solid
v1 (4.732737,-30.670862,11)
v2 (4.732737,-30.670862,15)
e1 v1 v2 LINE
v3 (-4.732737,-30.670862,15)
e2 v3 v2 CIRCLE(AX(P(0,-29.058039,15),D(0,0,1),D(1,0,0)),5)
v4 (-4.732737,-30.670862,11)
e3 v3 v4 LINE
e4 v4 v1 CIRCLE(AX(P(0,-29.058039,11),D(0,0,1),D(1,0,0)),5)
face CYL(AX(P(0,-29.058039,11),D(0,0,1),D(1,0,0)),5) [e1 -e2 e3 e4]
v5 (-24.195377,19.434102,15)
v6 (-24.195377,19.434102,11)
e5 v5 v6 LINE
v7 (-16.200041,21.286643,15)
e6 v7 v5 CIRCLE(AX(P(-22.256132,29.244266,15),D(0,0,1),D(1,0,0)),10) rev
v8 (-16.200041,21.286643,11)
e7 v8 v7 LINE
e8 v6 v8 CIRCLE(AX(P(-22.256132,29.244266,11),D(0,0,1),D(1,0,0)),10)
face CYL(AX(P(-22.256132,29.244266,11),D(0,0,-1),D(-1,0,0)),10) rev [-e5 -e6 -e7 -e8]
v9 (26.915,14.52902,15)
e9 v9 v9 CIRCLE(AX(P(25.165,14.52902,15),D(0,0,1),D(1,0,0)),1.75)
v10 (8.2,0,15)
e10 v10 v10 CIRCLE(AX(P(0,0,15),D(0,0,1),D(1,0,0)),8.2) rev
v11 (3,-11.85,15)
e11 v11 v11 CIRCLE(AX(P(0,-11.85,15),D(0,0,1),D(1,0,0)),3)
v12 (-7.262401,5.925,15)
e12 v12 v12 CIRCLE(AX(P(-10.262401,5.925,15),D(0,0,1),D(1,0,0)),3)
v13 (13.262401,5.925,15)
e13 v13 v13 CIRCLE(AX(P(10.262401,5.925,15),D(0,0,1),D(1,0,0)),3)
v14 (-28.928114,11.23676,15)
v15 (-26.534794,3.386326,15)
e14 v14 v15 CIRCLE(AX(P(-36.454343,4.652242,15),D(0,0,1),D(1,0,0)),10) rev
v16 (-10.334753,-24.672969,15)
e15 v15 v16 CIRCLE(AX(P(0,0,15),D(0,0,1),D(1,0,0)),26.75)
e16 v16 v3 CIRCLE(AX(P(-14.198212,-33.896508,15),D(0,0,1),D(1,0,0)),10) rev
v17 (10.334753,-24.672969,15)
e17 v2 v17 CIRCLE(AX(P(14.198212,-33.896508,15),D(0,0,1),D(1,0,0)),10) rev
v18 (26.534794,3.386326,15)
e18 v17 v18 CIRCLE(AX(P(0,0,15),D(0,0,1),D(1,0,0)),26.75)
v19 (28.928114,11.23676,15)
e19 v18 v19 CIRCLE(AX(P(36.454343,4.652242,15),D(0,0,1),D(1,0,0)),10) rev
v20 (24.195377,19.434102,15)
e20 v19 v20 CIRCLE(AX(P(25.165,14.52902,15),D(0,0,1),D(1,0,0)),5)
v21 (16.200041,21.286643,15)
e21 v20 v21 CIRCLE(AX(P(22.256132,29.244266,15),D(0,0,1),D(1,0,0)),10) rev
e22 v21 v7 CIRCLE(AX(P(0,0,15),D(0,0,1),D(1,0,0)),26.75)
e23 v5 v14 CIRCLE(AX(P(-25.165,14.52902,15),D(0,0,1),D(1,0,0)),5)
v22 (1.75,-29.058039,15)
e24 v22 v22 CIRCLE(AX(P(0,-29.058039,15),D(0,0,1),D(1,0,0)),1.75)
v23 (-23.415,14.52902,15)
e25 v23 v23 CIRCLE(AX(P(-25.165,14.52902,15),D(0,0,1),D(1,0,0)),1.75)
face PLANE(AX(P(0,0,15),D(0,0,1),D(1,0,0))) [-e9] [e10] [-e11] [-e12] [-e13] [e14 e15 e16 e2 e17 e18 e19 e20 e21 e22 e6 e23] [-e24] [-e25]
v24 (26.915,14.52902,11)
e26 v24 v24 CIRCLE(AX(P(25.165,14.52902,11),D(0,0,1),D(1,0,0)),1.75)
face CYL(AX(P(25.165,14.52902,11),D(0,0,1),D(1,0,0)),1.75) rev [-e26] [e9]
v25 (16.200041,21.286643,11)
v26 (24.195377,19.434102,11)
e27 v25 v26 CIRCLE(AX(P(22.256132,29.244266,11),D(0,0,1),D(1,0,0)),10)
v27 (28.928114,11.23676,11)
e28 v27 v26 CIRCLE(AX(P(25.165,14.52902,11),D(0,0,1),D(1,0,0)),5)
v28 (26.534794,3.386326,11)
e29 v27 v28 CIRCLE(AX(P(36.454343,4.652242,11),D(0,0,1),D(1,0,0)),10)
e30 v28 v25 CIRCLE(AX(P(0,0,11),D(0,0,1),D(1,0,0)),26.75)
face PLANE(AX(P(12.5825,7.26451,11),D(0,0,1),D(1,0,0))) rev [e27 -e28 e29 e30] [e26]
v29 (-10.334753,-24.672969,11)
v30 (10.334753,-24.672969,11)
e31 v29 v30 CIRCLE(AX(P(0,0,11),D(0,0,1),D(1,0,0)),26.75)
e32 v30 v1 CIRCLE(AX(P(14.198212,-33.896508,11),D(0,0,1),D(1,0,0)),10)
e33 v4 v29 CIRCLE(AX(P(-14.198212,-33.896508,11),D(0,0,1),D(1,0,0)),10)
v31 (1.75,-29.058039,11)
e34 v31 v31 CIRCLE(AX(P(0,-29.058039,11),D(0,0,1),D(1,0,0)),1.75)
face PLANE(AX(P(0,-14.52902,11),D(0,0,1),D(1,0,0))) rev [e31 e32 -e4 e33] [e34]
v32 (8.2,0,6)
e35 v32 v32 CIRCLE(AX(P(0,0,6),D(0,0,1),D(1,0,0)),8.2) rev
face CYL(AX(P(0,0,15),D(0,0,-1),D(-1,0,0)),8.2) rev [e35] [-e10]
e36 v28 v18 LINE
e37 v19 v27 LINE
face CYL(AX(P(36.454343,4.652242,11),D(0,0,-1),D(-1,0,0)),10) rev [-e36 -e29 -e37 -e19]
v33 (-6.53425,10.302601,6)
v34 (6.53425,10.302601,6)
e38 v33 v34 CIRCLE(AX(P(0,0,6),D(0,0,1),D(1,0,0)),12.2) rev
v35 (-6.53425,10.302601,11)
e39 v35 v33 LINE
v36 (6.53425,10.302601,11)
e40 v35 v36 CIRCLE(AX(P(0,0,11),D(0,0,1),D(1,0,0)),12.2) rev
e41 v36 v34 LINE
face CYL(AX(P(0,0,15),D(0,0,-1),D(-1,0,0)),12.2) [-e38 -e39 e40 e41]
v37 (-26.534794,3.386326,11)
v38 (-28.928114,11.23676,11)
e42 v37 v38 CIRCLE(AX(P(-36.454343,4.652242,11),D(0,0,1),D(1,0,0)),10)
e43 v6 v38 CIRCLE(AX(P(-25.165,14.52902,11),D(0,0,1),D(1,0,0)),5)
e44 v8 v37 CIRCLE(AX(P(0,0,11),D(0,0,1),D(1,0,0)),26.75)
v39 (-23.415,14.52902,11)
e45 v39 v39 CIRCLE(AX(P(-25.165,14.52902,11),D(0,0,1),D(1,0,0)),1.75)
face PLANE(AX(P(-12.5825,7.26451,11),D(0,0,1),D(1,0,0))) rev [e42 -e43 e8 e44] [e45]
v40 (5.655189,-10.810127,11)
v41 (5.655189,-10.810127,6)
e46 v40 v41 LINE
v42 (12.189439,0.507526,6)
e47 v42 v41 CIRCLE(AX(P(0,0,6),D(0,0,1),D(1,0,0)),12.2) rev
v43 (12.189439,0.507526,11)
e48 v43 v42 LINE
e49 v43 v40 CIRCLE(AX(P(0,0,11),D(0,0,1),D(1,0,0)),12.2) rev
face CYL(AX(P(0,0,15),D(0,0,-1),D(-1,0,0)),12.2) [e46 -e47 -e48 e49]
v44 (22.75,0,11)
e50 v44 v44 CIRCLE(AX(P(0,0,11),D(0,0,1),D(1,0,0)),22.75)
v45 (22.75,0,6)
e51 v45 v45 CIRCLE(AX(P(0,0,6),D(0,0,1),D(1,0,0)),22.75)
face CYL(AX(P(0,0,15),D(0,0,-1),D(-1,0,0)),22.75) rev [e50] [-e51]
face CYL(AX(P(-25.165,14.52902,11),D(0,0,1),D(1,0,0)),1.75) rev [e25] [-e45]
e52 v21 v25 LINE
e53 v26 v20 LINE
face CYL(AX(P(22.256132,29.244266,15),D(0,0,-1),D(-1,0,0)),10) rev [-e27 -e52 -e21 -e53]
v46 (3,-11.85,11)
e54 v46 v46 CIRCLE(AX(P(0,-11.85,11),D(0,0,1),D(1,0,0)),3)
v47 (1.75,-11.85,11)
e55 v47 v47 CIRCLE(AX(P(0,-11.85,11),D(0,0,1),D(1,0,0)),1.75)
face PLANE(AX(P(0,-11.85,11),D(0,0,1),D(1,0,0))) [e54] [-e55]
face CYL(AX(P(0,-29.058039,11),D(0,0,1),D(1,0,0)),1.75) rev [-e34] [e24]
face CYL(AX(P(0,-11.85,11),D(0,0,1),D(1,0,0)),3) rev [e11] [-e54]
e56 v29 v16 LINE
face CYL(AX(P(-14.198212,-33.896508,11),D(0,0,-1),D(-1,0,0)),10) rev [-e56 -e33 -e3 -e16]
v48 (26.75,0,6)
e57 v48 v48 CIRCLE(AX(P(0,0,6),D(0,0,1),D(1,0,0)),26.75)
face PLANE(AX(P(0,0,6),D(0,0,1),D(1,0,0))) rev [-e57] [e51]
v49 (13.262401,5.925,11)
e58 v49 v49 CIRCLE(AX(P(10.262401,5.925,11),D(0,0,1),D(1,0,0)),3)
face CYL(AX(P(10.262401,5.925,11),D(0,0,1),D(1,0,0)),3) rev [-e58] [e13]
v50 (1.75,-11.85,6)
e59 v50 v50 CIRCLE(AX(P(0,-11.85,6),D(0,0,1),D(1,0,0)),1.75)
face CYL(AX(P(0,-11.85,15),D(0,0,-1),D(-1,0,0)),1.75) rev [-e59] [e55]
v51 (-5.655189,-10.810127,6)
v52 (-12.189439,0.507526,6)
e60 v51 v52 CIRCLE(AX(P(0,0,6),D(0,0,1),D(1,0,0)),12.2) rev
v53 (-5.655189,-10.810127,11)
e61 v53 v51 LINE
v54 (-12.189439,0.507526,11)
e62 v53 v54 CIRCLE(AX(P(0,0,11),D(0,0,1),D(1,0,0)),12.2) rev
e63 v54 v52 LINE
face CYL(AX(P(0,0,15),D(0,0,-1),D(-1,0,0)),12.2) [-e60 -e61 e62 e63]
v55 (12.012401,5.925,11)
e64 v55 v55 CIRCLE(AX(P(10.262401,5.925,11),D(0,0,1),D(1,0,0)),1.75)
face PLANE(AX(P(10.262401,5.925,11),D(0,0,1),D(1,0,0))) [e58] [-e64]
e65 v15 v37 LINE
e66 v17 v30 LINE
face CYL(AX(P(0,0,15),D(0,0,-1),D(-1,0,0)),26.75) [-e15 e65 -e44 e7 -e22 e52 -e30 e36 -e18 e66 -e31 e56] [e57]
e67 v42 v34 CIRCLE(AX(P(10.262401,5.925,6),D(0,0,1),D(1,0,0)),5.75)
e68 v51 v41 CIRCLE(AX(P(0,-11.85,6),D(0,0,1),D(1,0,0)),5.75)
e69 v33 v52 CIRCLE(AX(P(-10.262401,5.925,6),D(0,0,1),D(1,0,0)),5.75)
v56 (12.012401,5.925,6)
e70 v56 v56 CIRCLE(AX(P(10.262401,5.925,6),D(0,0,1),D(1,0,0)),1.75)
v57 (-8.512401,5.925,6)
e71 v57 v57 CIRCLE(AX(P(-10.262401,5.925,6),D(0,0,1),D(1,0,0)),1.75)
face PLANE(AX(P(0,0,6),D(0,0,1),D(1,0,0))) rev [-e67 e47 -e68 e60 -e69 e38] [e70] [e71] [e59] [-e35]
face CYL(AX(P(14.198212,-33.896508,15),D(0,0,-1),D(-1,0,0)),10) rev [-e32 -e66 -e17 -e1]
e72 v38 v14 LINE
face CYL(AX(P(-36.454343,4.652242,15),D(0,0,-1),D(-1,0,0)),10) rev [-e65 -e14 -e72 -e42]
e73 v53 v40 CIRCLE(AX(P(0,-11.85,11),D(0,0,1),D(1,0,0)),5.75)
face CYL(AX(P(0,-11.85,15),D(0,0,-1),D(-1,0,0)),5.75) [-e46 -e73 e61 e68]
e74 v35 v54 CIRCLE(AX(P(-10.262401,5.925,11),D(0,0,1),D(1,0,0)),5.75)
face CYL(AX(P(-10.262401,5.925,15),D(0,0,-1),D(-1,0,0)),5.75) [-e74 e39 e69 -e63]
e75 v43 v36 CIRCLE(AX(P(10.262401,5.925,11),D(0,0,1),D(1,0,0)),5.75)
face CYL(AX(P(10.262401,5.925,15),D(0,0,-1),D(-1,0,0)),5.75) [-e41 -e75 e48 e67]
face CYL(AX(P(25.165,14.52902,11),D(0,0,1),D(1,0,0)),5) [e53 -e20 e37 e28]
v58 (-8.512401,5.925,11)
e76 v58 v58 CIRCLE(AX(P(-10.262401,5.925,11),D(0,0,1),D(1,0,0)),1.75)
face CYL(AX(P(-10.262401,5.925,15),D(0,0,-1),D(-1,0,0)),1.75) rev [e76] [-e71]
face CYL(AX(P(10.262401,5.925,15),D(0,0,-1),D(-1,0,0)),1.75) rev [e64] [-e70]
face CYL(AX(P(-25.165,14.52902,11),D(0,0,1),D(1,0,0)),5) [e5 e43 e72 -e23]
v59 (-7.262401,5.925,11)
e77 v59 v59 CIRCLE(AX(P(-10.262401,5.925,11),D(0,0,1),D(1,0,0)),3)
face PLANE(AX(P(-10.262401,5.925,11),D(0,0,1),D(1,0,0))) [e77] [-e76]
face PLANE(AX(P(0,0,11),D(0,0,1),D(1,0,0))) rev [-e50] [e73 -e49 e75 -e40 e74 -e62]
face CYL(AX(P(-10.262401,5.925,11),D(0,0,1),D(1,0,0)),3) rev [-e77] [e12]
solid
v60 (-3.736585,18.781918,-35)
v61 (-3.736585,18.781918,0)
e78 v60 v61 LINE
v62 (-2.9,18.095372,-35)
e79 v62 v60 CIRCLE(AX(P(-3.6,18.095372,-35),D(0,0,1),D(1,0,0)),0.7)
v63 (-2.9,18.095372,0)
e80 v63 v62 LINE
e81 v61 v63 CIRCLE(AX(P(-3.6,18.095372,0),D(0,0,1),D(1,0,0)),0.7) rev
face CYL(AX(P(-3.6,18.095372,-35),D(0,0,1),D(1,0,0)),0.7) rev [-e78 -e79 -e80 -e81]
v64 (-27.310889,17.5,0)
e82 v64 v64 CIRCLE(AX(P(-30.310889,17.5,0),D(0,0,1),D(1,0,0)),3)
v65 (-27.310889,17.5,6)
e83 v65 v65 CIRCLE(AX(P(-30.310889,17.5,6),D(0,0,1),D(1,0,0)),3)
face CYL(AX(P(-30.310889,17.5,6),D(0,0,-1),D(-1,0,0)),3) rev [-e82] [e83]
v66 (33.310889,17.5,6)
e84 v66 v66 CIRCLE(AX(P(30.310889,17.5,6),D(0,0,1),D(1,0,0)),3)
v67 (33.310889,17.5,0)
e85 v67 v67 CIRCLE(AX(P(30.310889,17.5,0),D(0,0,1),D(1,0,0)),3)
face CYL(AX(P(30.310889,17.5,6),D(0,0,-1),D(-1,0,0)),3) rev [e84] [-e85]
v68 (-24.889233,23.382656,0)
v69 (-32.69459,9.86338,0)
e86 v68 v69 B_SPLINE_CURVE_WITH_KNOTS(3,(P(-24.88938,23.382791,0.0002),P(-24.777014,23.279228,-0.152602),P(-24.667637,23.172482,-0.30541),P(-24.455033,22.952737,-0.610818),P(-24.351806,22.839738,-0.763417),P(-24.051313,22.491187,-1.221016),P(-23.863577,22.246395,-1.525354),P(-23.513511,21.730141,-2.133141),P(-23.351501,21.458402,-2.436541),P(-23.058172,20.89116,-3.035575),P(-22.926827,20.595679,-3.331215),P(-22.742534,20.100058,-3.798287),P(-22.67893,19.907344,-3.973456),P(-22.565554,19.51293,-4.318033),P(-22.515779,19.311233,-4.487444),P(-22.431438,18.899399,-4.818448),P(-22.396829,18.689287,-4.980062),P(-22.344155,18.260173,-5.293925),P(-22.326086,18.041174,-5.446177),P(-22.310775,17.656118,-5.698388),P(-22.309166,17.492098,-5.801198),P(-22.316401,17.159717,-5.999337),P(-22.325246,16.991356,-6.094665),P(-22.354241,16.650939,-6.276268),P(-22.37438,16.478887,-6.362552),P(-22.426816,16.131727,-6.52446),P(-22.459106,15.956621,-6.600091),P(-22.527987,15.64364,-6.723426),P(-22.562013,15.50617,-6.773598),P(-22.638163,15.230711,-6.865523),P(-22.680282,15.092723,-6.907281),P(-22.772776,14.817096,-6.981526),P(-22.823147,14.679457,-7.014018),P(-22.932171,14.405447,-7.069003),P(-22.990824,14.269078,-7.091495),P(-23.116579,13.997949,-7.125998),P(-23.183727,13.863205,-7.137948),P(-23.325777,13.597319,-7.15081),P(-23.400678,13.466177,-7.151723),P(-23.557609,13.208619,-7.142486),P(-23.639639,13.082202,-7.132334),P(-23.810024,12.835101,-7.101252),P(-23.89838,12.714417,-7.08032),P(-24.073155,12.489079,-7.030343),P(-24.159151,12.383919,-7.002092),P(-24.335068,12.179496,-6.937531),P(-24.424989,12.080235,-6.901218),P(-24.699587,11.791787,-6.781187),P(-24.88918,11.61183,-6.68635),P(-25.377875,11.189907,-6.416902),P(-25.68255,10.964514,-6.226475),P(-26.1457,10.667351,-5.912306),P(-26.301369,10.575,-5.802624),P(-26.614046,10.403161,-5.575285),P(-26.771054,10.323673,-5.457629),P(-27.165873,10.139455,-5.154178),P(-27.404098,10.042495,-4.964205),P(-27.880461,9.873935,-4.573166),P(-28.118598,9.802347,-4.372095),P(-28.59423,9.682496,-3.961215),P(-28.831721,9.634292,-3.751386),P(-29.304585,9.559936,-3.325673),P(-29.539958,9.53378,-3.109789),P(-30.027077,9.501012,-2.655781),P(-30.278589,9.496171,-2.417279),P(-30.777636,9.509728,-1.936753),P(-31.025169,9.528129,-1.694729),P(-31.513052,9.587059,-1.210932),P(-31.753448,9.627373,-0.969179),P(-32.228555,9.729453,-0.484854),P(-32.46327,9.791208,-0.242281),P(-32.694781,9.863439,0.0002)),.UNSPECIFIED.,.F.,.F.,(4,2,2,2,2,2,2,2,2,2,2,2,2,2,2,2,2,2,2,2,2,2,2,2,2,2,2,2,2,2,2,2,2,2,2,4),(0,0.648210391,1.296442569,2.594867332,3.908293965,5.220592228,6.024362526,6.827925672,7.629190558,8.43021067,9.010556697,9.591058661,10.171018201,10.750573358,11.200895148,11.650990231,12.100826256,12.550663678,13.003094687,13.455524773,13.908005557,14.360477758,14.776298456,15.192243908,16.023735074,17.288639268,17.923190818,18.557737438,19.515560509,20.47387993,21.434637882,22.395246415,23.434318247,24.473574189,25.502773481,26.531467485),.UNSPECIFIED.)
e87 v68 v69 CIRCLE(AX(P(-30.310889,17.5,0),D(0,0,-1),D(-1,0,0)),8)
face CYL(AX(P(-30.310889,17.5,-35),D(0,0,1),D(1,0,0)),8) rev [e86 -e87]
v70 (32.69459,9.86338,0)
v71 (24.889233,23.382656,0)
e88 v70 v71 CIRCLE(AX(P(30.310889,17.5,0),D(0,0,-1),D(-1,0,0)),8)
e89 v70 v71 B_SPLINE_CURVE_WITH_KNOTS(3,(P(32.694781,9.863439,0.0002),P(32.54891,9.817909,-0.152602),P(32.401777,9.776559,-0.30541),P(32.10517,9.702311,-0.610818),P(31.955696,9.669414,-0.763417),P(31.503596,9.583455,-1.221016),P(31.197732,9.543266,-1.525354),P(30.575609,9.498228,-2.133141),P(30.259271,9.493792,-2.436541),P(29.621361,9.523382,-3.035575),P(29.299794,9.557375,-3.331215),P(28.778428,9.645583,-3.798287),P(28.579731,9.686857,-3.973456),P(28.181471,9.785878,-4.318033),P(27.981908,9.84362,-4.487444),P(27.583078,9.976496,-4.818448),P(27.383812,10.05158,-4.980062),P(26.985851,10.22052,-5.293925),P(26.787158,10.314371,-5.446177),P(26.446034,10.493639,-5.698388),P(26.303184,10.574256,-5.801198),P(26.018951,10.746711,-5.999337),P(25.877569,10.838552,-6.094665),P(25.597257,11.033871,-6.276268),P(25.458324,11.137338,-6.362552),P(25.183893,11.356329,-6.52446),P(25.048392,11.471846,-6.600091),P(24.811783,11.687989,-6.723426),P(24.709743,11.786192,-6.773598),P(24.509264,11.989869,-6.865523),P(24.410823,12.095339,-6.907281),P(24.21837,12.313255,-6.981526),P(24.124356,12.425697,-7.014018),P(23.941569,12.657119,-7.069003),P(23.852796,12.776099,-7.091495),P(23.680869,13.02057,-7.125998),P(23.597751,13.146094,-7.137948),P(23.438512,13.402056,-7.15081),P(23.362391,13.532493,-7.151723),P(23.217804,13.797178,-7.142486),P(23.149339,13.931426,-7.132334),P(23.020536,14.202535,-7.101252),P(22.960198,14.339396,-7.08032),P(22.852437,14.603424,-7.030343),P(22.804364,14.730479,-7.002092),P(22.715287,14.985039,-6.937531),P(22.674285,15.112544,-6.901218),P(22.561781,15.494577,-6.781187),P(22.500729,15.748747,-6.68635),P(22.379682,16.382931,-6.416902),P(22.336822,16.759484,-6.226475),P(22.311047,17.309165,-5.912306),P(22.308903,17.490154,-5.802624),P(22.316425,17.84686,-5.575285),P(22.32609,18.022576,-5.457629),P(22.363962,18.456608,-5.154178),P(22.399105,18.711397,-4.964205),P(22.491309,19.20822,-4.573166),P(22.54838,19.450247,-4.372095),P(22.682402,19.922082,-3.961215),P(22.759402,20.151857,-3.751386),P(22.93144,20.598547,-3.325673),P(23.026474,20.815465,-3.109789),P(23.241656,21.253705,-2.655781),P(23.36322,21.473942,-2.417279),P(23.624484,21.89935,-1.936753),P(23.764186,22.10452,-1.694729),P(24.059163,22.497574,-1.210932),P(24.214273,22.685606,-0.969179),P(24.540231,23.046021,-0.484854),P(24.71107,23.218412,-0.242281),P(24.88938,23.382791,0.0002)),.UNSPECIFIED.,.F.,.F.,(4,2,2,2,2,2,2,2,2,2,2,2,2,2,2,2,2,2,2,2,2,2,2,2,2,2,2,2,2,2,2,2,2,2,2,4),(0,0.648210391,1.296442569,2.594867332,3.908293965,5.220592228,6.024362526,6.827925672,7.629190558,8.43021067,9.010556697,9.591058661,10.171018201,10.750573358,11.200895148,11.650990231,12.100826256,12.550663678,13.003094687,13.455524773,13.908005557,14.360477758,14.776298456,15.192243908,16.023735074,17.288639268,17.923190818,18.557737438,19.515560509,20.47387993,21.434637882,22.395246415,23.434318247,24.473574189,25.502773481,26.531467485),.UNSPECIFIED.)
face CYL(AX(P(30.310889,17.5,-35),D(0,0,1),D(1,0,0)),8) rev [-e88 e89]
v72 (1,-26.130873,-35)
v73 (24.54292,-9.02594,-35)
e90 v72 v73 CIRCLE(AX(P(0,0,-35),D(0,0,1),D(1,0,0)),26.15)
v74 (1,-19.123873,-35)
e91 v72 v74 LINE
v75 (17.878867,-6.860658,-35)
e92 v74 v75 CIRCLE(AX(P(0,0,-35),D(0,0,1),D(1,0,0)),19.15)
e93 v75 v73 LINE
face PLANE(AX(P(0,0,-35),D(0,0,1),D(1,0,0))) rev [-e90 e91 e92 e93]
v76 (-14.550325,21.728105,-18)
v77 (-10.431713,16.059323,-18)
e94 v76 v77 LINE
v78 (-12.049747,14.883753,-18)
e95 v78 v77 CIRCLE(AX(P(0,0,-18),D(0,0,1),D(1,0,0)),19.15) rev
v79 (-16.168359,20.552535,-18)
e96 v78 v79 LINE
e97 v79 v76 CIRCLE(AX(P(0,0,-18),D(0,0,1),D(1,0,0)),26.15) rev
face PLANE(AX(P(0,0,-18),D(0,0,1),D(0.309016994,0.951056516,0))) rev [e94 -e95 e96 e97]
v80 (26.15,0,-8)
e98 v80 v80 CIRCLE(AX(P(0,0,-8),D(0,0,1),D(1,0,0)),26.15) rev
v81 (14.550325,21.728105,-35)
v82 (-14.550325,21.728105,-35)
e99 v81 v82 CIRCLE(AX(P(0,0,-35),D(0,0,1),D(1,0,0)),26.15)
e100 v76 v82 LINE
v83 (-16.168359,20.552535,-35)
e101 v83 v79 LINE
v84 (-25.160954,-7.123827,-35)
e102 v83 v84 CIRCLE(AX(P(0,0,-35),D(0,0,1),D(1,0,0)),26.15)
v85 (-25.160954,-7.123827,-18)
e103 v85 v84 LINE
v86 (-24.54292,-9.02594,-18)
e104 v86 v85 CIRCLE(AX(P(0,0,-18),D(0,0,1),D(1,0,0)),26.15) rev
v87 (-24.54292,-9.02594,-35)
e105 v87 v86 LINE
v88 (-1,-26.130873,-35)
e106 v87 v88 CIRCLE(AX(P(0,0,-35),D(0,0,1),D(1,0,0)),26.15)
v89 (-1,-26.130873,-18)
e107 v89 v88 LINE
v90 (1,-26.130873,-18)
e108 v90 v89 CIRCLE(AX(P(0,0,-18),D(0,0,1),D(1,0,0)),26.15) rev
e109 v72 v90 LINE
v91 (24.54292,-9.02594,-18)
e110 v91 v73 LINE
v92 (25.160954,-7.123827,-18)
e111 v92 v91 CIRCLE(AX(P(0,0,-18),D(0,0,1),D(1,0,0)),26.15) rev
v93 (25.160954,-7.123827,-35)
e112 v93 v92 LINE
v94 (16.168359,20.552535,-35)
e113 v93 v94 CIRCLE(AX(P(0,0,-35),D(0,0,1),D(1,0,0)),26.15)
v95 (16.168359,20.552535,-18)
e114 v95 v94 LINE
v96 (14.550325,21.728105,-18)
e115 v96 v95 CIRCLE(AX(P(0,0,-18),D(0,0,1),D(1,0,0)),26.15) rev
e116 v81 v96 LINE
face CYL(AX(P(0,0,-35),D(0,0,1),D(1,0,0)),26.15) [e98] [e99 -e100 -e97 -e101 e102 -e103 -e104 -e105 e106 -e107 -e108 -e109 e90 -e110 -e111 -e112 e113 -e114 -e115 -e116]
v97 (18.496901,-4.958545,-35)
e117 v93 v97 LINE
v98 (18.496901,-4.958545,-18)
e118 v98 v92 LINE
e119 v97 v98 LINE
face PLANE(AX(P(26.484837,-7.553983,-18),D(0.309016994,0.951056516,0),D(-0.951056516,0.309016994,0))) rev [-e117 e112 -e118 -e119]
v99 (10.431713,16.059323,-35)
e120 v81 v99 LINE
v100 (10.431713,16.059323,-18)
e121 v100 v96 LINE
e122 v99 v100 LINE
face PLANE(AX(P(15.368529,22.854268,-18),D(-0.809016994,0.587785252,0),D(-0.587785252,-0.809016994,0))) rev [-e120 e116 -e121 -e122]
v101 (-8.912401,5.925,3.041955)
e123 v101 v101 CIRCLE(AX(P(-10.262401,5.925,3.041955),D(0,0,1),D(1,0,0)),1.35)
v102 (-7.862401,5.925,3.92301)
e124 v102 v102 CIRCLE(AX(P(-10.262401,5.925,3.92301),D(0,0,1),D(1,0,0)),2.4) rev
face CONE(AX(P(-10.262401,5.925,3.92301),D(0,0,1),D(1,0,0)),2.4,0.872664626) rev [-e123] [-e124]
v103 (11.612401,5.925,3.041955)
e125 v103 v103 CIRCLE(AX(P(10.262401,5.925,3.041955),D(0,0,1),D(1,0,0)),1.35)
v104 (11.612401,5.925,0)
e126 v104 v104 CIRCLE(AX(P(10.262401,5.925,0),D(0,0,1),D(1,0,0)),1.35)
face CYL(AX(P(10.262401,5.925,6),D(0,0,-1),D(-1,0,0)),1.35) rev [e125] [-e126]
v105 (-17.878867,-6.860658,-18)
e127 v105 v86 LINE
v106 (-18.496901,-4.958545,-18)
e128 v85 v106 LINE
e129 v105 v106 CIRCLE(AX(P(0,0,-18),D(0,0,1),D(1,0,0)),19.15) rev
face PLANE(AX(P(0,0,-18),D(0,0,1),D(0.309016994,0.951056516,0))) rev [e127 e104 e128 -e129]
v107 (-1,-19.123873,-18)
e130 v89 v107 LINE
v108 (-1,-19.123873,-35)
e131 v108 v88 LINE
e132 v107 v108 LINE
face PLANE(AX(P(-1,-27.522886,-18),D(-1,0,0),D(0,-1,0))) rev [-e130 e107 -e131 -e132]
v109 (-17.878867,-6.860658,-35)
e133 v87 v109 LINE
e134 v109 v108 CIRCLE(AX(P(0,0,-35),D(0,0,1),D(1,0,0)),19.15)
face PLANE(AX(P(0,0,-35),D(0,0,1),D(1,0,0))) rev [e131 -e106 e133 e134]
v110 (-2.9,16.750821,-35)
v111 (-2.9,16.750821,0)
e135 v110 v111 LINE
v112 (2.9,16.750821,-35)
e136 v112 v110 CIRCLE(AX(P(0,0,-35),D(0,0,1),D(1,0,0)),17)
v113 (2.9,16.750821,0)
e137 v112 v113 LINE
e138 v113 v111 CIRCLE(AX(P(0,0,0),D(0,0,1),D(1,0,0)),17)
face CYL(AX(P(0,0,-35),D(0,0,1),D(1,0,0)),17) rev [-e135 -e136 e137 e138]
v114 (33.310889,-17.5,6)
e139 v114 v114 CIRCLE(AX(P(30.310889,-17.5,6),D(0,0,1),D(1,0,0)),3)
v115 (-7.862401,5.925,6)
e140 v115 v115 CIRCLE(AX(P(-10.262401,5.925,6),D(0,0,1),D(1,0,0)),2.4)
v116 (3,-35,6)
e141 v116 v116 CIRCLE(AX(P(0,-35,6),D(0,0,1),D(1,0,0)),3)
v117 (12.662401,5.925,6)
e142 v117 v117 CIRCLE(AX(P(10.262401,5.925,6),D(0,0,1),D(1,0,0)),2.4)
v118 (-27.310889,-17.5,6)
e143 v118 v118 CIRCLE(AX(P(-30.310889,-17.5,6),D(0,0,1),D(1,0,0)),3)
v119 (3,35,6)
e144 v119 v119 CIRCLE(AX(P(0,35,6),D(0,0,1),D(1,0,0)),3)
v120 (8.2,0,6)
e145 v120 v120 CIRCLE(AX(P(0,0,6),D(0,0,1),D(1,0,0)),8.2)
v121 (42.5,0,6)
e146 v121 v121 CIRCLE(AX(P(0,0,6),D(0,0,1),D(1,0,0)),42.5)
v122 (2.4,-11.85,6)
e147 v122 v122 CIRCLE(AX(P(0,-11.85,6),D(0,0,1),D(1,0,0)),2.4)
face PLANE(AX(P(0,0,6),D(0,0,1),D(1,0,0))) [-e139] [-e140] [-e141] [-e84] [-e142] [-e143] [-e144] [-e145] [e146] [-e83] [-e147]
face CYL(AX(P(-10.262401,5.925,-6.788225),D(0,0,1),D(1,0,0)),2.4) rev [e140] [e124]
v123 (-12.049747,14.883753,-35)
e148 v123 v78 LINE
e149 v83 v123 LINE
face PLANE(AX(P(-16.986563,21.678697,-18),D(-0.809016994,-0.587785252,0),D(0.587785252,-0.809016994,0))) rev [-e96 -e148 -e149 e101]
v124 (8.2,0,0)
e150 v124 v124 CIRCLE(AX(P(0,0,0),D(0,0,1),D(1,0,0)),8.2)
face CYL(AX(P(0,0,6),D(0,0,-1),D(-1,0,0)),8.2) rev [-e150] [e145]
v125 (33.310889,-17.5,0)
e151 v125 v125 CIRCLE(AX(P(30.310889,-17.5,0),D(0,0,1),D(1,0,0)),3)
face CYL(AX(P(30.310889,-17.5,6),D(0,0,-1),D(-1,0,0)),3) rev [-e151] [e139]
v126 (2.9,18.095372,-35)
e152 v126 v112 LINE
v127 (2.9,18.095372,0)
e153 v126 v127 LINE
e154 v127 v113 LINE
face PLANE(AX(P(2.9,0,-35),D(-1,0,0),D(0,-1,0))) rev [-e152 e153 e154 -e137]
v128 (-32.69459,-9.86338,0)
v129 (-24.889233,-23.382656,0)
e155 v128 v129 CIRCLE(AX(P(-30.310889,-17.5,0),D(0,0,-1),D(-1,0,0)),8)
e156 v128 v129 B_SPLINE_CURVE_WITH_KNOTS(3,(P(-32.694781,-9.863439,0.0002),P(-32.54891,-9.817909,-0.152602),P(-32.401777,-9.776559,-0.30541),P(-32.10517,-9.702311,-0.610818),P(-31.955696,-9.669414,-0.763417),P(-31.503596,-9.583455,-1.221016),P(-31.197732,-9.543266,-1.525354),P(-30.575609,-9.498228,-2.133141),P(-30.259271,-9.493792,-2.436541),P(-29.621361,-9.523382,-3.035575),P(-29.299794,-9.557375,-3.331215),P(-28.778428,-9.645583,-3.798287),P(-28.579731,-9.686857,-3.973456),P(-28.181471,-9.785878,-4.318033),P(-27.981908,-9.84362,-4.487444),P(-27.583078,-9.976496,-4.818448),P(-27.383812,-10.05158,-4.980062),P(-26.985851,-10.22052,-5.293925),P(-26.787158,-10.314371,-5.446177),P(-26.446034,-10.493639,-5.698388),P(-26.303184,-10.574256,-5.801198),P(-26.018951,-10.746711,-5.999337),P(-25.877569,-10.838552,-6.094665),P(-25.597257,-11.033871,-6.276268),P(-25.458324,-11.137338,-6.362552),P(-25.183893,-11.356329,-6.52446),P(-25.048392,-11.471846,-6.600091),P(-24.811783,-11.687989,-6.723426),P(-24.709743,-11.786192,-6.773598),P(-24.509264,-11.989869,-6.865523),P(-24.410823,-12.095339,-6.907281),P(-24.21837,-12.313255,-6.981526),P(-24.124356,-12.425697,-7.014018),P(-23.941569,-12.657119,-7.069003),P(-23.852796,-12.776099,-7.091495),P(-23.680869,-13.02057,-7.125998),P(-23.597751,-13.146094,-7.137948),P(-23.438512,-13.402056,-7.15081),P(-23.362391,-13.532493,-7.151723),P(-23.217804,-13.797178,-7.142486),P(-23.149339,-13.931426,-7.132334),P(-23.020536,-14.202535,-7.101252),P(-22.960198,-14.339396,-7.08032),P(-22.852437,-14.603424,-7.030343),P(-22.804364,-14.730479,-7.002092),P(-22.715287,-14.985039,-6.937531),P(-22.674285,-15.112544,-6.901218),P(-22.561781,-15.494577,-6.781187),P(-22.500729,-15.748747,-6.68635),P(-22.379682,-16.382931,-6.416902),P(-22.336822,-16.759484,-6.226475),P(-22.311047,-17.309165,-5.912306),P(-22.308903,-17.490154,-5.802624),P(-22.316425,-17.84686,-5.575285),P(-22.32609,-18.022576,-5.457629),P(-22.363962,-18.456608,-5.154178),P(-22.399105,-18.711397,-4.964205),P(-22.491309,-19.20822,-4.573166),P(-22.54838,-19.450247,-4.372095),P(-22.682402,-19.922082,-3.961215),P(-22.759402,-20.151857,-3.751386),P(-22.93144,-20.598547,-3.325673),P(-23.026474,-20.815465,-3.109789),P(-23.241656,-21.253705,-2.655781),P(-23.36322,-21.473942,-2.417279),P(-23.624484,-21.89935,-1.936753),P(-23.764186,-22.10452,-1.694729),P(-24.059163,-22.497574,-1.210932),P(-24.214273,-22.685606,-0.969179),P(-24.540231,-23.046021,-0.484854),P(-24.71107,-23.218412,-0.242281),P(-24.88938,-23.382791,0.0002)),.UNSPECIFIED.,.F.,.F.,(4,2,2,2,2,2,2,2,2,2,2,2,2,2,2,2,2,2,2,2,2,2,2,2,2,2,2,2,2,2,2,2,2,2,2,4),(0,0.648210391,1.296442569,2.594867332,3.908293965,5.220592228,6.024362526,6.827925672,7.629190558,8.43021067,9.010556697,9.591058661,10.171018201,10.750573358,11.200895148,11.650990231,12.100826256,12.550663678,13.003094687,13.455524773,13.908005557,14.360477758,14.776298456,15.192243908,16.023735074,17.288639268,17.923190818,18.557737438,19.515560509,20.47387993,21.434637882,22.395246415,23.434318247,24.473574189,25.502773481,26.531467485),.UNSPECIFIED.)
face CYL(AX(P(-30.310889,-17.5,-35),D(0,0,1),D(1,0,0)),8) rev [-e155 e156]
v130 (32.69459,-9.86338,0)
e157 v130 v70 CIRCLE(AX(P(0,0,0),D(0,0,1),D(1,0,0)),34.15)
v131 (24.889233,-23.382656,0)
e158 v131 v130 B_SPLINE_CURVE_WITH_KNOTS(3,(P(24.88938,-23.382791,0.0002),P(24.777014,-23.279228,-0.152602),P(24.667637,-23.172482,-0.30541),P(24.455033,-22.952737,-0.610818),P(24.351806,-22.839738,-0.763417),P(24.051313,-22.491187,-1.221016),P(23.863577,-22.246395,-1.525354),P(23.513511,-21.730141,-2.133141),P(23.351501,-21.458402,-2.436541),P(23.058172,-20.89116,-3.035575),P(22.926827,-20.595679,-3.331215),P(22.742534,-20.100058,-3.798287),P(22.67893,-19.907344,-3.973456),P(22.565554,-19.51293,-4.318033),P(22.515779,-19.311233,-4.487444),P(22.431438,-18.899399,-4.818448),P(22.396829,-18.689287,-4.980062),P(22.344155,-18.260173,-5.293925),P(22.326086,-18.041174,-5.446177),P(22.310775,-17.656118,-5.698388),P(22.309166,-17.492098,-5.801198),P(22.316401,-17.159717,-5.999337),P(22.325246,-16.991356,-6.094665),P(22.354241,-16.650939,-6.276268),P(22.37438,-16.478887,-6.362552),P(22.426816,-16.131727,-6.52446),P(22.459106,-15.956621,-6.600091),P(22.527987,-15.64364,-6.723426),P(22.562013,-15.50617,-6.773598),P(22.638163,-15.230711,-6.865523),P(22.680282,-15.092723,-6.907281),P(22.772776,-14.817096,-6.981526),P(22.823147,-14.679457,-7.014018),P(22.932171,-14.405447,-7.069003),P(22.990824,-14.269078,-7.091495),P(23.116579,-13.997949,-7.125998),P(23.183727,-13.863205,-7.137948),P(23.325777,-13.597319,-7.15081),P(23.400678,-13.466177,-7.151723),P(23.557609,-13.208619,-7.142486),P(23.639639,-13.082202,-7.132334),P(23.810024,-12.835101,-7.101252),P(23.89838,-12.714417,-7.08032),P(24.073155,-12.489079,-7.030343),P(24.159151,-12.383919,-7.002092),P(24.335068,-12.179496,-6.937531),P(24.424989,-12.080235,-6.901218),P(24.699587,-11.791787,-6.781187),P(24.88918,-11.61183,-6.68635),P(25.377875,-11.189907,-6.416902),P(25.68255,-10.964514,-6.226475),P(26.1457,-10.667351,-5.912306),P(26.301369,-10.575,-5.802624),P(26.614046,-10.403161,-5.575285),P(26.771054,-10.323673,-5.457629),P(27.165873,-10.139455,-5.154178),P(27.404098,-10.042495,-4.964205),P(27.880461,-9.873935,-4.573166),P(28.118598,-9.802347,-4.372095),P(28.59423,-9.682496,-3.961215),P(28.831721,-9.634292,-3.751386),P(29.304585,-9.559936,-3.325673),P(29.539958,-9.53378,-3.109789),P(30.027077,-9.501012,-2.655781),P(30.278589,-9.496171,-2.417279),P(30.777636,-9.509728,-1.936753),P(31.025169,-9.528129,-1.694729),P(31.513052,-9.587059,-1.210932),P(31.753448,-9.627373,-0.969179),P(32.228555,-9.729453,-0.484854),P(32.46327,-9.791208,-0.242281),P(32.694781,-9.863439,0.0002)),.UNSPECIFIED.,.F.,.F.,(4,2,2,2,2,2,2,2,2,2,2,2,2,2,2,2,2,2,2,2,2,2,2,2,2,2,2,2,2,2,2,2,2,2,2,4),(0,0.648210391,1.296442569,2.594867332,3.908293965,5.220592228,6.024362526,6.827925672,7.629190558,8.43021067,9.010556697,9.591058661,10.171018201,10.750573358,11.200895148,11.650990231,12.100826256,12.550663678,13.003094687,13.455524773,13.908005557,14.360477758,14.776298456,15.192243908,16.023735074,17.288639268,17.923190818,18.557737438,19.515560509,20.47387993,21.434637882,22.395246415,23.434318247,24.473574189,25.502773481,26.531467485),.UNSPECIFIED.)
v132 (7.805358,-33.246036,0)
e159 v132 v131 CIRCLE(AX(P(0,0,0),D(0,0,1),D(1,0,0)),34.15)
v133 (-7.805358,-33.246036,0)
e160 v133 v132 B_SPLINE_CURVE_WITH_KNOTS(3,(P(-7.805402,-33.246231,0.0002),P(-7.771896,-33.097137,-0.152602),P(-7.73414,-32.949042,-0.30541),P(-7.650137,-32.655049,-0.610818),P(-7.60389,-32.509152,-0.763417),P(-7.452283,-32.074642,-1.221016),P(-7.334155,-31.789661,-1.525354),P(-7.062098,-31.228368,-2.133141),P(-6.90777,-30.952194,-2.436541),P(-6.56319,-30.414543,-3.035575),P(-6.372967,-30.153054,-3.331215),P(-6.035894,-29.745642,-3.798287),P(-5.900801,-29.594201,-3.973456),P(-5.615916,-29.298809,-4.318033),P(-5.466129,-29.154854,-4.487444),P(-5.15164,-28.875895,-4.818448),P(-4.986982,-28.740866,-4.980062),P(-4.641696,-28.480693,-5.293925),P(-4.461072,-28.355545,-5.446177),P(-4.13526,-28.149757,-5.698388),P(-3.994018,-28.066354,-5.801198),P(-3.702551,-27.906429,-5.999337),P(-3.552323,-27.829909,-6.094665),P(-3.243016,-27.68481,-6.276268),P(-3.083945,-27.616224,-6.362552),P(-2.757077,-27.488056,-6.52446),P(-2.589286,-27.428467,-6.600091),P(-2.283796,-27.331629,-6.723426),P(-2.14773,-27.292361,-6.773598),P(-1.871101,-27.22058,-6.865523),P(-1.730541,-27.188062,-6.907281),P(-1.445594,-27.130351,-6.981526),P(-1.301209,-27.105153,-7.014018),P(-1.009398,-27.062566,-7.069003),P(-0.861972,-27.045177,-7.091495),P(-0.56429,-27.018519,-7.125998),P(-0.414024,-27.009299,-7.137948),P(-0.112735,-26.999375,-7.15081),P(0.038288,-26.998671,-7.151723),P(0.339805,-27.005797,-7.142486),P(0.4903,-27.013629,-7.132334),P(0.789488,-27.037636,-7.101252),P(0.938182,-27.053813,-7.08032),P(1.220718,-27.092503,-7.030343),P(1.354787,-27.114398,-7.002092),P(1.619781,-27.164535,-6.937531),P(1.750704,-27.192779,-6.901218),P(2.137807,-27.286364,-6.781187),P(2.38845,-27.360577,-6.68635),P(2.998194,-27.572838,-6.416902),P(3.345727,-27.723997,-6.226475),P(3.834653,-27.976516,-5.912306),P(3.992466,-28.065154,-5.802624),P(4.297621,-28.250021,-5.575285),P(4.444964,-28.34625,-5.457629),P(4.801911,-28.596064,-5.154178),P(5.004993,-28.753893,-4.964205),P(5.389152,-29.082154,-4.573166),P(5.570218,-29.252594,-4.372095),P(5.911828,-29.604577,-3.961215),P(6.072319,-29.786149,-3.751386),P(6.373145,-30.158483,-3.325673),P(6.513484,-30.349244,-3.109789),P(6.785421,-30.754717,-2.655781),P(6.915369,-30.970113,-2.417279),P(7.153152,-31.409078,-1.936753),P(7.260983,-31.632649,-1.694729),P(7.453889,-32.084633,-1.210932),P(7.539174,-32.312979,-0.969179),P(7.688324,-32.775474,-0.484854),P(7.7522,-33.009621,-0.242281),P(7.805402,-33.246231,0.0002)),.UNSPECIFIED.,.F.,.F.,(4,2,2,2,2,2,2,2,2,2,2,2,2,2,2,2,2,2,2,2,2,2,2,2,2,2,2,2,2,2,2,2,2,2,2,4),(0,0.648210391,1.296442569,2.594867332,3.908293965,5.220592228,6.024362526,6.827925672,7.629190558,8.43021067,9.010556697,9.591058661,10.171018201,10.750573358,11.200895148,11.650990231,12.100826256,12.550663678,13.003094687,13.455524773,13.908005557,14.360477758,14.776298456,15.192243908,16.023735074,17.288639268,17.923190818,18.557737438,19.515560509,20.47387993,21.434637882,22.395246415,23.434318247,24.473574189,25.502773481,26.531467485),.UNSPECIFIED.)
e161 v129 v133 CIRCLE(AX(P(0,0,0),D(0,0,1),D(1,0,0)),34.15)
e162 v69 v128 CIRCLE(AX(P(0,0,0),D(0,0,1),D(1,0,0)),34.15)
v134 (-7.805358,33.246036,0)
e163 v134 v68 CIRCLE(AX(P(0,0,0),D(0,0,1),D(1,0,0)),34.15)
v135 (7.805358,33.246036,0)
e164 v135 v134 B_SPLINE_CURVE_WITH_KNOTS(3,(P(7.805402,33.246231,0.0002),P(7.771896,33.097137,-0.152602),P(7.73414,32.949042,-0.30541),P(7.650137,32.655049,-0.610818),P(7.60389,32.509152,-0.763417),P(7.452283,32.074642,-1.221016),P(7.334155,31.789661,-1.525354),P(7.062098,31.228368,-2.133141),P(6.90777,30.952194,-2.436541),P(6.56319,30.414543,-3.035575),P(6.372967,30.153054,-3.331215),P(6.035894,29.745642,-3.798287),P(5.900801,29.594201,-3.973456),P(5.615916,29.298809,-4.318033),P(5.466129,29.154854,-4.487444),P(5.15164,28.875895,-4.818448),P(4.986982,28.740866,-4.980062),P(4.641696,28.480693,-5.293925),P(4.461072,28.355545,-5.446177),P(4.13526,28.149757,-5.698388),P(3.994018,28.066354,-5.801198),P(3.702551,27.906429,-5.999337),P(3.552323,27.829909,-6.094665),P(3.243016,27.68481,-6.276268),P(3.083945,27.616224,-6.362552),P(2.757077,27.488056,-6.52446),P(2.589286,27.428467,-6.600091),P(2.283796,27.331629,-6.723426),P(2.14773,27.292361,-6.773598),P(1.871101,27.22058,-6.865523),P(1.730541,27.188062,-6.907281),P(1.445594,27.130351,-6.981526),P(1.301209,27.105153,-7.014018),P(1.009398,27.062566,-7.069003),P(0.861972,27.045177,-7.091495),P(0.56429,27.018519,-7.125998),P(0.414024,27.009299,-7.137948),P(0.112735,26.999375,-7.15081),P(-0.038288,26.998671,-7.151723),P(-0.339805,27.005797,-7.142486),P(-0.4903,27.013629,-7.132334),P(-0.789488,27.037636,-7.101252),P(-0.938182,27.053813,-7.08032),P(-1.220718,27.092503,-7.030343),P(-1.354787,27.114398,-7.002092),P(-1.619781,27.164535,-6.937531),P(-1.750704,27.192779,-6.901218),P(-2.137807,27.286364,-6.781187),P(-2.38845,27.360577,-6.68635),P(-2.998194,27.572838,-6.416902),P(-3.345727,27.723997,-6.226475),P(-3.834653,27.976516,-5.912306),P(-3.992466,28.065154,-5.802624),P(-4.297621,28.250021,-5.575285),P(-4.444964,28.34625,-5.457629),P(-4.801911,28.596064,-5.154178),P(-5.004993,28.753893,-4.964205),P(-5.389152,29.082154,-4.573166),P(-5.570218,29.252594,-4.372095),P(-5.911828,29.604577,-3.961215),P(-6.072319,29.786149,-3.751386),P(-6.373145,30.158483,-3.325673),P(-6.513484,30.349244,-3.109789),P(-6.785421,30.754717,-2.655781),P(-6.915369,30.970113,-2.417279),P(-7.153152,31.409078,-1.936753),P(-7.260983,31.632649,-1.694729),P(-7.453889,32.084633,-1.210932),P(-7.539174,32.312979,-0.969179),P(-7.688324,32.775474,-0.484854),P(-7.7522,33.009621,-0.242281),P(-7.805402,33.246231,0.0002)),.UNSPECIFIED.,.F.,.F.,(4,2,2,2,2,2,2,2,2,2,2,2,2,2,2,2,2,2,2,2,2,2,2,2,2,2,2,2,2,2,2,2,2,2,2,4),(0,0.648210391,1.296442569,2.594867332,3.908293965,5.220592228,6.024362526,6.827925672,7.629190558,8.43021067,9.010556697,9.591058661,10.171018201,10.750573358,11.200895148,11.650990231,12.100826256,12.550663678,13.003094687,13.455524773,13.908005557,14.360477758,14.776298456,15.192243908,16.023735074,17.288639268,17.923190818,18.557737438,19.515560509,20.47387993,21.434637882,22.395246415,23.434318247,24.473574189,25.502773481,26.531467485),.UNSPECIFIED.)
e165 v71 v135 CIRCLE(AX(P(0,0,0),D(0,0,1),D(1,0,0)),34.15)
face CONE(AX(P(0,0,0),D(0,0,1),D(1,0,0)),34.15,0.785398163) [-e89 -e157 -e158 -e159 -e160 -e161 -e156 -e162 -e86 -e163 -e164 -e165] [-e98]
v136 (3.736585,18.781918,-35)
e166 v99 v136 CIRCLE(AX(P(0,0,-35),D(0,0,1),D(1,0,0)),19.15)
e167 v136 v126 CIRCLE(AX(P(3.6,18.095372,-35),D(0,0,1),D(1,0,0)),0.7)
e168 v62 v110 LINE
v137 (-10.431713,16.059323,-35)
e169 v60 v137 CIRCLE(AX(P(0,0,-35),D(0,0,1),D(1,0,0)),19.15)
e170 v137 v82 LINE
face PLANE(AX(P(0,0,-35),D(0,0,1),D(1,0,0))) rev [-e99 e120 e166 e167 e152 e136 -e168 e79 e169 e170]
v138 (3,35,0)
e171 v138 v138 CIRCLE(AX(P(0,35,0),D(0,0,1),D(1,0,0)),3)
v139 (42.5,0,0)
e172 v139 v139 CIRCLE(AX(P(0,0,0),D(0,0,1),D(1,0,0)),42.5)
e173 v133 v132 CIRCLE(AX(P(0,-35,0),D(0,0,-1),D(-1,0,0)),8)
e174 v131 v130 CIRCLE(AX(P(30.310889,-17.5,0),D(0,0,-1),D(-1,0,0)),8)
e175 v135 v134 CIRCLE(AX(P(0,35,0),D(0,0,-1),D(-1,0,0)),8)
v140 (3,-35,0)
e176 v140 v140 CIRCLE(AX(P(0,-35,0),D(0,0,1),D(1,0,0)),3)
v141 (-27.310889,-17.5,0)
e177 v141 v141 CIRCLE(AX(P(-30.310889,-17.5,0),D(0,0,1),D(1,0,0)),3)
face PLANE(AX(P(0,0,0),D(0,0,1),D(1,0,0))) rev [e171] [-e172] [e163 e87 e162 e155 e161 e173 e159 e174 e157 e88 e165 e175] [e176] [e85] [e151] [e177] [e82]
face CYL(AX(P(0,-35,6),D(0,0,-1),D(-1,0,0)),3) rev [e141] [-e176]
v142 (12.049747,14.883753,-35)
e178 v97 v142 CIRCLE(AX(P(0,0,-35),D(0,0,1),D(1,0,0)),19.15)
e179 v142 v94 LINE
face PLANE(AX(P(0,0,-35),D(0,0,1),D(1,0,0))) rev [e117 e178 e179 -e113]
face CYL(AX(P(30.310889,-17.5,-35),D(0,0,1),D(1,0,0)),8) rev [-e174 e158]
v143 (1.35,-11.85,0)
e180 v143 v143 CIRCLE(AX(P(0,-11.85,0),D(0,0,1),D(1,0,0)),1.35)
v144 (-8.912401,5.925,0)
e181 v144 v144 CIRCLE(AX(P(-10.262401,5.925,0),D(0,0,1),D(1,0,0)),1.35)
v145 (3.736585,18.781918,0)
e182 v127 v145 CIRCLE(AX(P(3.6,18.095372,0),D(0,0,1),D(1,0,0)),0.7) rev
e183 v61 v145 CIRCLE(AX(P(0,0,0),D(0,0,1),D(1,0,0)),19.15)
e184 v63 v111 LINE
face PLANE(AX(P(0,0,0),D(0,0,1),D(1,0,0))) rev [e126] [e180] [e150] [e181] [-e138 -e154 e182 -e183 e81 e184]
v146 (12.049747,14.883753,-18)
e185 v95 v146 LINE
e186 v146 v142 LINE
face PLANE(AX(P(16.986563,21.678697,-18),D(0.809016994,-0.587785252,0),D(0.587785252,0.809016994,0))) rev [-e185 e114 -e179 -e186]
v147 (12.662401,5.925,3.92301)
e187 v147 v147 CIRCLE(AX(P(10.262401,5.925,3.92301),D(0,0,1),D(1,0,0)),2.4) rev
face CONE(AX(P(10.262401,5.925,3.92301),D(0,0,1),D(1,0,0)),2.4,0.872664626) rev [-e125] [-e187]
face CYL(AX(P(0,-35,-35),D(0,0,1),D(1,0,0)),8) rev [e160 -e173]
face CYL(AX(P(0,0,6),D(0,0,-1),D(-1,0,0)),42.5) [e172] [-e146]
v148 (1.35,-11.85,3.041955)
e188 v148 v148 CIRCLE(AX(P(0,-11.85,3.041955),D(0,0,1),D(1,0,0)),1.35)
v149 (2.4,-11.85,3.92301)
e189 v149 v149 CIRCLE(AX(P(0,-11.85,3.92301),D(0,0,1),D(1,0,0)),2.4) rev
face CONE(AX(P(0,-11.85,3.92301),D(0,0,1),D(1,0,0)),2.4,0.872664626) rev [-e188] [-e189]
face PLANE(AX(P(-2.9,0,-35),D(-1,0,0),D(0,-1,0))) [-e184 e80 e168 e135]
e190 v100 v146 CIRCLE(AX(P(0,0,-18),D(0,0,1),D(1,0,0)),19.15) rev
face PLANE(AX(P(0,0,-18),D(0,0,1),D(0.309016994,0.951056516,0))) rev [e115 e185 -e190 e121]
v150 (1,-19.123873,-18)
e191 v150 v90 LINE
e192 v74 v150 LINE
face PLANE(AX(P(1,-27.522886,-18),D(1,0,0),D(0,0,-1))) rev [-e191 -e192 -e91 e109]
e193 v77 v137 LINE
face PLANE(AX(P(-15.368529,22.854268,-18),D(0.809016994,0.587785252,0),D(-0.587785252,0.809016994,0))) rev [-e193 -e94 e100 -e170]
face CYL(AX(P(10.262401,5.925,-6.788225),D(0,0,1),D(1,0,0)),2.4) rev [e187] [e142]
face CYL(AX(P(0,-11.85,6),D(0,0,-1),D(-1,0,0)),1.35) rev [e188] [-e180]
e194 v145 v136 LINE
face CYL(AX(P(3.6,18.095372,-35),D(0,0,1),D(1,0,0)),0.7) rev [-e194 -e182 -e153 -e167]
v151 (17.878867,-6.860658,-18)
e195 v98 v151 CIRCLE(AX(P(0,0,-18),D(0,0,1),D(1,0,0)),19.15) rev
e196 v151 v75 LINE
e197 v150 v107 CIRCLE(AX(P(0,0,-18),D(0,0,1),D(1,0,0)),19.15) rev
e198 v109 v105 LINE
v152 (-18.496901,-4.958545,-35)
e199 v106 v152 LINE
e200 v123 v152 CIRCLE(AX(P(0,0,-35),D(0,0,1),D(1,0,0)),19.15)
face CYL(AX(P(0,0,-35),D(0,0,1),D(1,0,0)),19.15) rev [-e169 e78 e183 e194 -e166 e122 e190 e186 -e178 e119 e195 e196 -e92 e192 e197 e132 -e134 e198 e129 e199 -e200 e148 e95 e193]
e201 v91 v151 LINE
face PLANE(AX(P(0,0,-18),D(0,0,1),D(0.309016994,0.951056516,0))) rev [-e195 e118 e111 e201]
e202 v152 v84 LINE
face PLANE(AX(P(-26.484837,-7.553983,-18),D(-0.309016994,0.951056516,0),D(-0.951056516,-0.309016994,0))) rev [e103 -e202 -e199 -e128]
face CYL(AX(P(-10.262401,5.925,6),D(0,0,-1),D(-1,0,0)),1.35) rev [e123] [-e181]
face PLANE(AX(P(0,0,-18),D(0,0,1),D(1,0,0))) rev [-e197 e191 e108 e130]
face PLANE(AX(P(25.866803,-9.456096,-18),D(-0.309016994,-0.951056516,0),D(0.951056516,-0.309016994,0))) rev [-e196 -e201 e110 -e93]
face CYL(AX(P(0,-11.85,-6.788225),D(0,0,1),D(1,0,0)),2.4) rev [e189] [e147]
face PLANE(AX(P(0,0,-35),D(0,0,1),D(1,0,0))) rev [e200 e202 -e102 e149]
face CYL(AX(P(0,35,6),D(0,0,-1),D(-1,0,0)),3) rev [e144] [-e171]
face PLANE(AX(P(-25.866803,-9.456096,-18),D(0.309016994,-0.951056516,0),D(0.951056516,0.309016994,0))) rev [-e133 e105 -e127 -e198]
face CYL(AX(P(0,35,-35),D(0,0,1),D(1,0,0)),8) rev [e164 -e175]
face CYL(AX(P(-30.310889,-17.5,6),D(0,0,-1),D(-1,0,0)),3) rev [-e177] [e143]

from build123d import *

# Parameters (mm, degrees)
SKETCH1_R               = 26.15
SKETCH1_R_2             = 19.15
BOSS_EXTRUDE1_DEPTH     = 35
FILLET1_R               = 0.7
SKETCH2_R               = 42.5
SKETCH2_R_2             = 3
SKETCH2_R_3             = 8.2
SKETCH2_R_4             = 1.35
BOSS_EXTRUDE2_DEPTH     = 6
SKETCH3_W               = 2
SKETCH3_H               = 27.522885867
CUT_EXTRUDE1_DEPTH      = 17
CIRPATTERN1_COUNT       = 5
CHAMFER1_SIZE           = 8
SKETCH4_R               = 8
CUT_EXTRUDE2_DEPTH      = 70.552138716
SKETCH7_R               = 2.4
CUT_EXTRUDE3_DEPTH      = 3
CHAMFER2_SIZE           = 0.923009594
CHAMFER2_SIZE_2         = 1.1
SKETCH9_R               = 26.75
SKETCH9_R_2             = 2.4
SKETCH9_R_3             = 8.2
SKETCH9_R_4             = 1.75
BOSS_EXTRUDE3_DEPTH     = 9
SHELL1_T                = -4
BOSS_EXTRUDE4_START     = 5
BOSS_EXTRUDE4_OUTLINE_R = 1.75
BOSS_EXTRUDE4_DEPTH     = 4
FILLET2_R               = 10
SKETCH10_R              = 3
CUT_EXTRUDE4_DEPTH      = 4


# Read off the part's stored shape, not the designer's step: Boss-Extrude4
with BuildPart() as part:
    # Sketch1 → Boss-Extrude1 (new body)
    # profile 1 of 3: a face of its own
    with BuildSketch(Plane.XY):
        Circle(SKETCH1_R)
        Circle(SKETCH1_R_2, mode=Mode.SUBTRACT)
    # profile 2 of 3: a face of its own
    with BuildSketch(Plane.XY):
        with BuildLine():
            Line((2.9, 18.929144196), (-2.9, 18.929144196))
            Line((-2.9, 18.929144196), (-2.9, 16.750820875))
            ThreePointArc((-2.9, 16.750820875), (0, 17), (2.9, 16.750820875))
            Line((2.9, 16.750820875), (2.9, 18.929144196))
        make_face()
    # profile 3 of 3: a face of its own
    with BuildSketch(Plane.XY):
        with BuildLine():
            ThreePointArc((2.9, 18.929144196), (0, 19.15), (-2.9, 18.929144196))
            Line((-2.9, 18.929144196), (2.9, 18.929144196))
        make_face()
    extrude(amount=-BOSS_EXTRUDE1_DEPTH)

    # Fillet1
    fillet1_edges = [part.edges().sort_by_distance(p)[0] for p in [
        (2.9, 18.929144196, -17.5),
        (-2.9, 18.929144196, -17.5),
    ]]
    fillet(fillet1_edges, radius=FILLET1_R)

    # Sketch2 → Boss-Extrude2 (add)
    with BuildSketch(Plane.XY):
        Circle(SKETCH2_R)
        with Locations((0, 35)):
            Circle(SKETCH2_R_2, mode=Mode.SUBTRACT)
        with Locations((30.310889132, 17.5)):
            Circle(SKETCH2_R_2, mode=Mode.SUBTRACT)
        with Locations((30.310889132, -17.5)):
            Circle(SKETCH2_R_2, mode=Mode.SUBTRACT)
        with Locations((0, -35)):
            Circle(SKETCH2_R_2, mode=Mode.SUBTRACT)
        with Locations((-30.310889132, -17.5)):
            Circle(SKETCH2_R_2, mode=Mode.SUBTRACT)
        with Locations((-30.310889132, 17.5)):
            Circle(SKETCH2_R_2, mode=Mode.SUBTRACT)
        Circle(SKETCH2_R_3, mode=Mode.SUBTRACT)
        with Locations((0, -11.85)):
            Circle(SKETCH2_R_4, mode=Mode.SUBTRACT)
        with Locations((-10.262401035, 5.925)):
            Circle(SKETCH2_R_4, mode=Mode.SUBTRACT)
        with Locations((10.262401035, 5.925)):
            Circle(SKETCH2_R_4, mode=Mode.SUBTRACT)
    extrude(amount=BOSS_EXTRUDE2_DEPTH)

    # Sketch3 → Cut-Extrude1 (cut)
    with BuildSketch(Plane(origin=(0, 0, -35), x_dir=(-1, 0, 0), z_dir=(0, 0, -1))):
        with Locations((0, -13.761442934)):
            Rectangle(SKETCH3_W, SKETCH3_H)
    cut_extrude1 = extrude(amount=-CUT_EXTRUDE1_DEPTH, mode=Mode.SUBTRACT)

    # CirPattern1: Cut-Extrude1 ×5 about axis
    cirpattern1_axis = Axis((0, 0, 0), (0, 0, 1))
    for i in range(1, CIRPATTERN1_COUNT):
        add(cut_extrude1.rotate(cirpattern1_axis, i * 360 / CIRPATTERN1_COUNT), mode=Mode.SUBTRACT)

    # Chamfer1
    # the kernel refuses this chamfer: 8 mm, written as the material it adds along each edge
    with BuildSketch(Plane(origin=(0, 0, 0), x_dir=(1, 0, 0), z_dir=(0, -1, 0))) as chamfer1_piece_1_section:
        Polygon((26.15 + CHAMFER1_SIZE, 0), (26.15, -CHAMFER1_SIZE), (26.15, 0), align=None)
    chamfer1_piece_1 = revolve(axis=Axis((0, 0, 0), (0, 0, 1)), mode=Mode.PRIVATE)
    chamfer1_piece_1 = chamfer1_piece_1 - Plane(origin=(0, -35, -3.86937464), x_dir=(1, 0, 0), z_dir=(0, 0, -1)) * Cylinder(3, 137, mode=Mode.PRIVATE)
    chamfer1_piece_1 = chamfer1_piece_1 - Plane(origin=(-30.310889132, -17.5, -3.86937464), x_dir=(1, 0, 0), z_dir=(0, 0, -1)) * Cylinder(3, 137, mode=Mode.PRIVATE)
    chamfer1_piece_1 = chamfer1_piece_1 - Plane(origin=(30.310889132, -17.5, -3.86937464), x_dir=(1, 0, 0), z_dir=(0, 0, -1)) * Cylinder(3, 137, mode=Mode.PRIVATE)
    chamfer1_piece_1 = chamfer1_piece_1 - Plane(origin=(-30.310889132, 17.5, -3.86937464), x_dir=(1, 0, 0), z_dir=(0, 0, -1)) * Cylinder(3, 137, mode=Mode.PRIVATE)
    chamfer1_piece_1 = chamfer1_piece_1 - Plane(origin=(0, 35, -3.86937464), x_dir=(1, 0, 0), z_dir=(0, 0, -1)) * Cylinder(3, 137, mode=Mode.PRIVATE)
    chamfer1_piece_1 = chamfer1_piece_1 - Plane(origin=(30.310889132, 17.5, -3.86937464), x_dir=(1, 0, 0), z_dir=(0, 0, -1)) * Cylinder(3, 137, mode=Mode.PRIVATE)
    add(chamfer1_piece_1)

    # Sketch4 → Cut-Extrude2 (cut, through all)
    with BuildSketch(Plane(origin=(0, 0, 0), x_dir=(-1, 0, 0), z_dir=(0, 0, -1))):
        with Locations((0, 35)):
            Circle(SKETCH4_R)
        with Locations((30.310889132, 17.5)):
            Circle(SKETCH4_R)
        with Locations((30.310889132, -17.5)):
            Circle(SKETCH4_R)
        with Locations((0, -35)):
            Circle(SKETCH4_R)
        with Locations((-30.310889132, -17.5)):
            Circle(SKETCH4_R)
        with Locations((-30.310889132, 17.5)):
            Circle(SKETCH4_R)
    extrude(amount=CUT_EXTRUDE2_DEPTH, mode=Mode.SUBTRACT)

    # Sketch7 → Cut-Extrude3 (cut)
    with BuildSketch(Plane.XY.offset(6)):
        with Locations((-10.262401035, 5.925)):
            Circle(SKETCH7_R)
        with Locations((10.262401035, 5.925)):
            Circle(SKETCH7_R)
        with Locations((0, -11.85)):
            Circle(SKETCH7_R)
    extrude(amount=-CUT_EXTRUDE3_DEPTH, mode=Mode.SUBTRACT)

    # Chamfer2
    # the kernel refuses this chamfer: 1.1, 0.923009594 mm, written as the material it adds along each edge
    with BuildSketch(Plane(origin=(-10.262401035, 5.925, 3), x_dir=(1, 0, 0), z_dir=(0, -1, 0))) as chamfer2_piece_1_section:
        Polygon((2.4, CHAMFER2_SIZE), (2.4 - CHAMFER2_SIZE_2, 0), (2.4, 0), align=None)
    chamfer2_piece_1 = revolve(axis=Axis((-10.262401035, 5.925, 3), (0, 0, 1)), mode=Mode.PRIVATE)
    chamfer2_piece_1 = chamfer2_piece_1 - Plane(origin=(-10.262401035, 5.925, 3.481852419), x_dir=(1, 0, 0), z_dir=(0, 0, -1)) * Cylinder(1.35, 10, mode=Mode.PRIVATE)
    add(chamfer2_piece_1)
    with BuildSketch(Plane(origin=(0, -11.85, 3), x_dir=(1, 0, 0), z_dir=(0, -1, 0))) as chamfer2_piece_2_section:
        Polygon((2.4, CHAMFER2_SIZE), (2.4 - CHAMFER2_SIZE_2, 0), (2.4, 0), align=None)
    chamfer2_piece_2 = revolve(axis=Axis((0, -11.85, 3), (0, 0, 1)), mode=Mode.PRIVATE)
    chamfer2_piece_2 = chamfer2_piece_2 - Plane(origin=(0, -11.85, 3.481852419), x_dir=(1, 0, 0), z_dir=(0, 0, -1)) * Cylinder(1.35, 10, mode=Mode.PRIVATE)
    add(chamfer2_piece_2)
    with BuildSketch(Plane(origin=(10.262401035, 5.925, 3), x_dir=(1, 0, 0), z_dir=(0, -1, 0))) as chamfer2_piece_3_section:
        Polygon((2.4, CHAMFER2_SIZE), (2.4 - CHAMFER2_SIZE_2, 0), (2.4, 0), align=None)
    chamfer2_piece_3 = revolve(axis=Axis((10.262401035, 5.925, 3), (0, 0, 1)), mode=Mode.PRIVATE)
    chamfer2_piece_3 = chamfer2_piece_3 - Plane(origin=(10.262401035, 5.925, 3.481852419), x_dir=(1, 0, 0), z_dir=(0, 0, -1)) * Cylinder(1.35, 10, mode=Mode.PRIVATE)
    add(chamfer2_piece_3)


with BuildPart() as body_2:
    # Sketch9 → Boss-Extrude3 (new body)
    # profile 1 of 4: a face of its own
    with BuildSketch(Plane.XY.offset(6)):
        Circle(SKETCH9_R)
        with Locations((-10.262401035, 5.925)):
            Circle(SKETCH9_R_2, mode=Mode.SUBTRACT)
        with Locations((0, -11.85)):
            Circle(SKETCH9_R_2, mode=Mode.SUBTRACT)
        Circle(SKETCH9_R_3, mode=Mode.SUBTRACT)
        with Locations((10.262401035, 5.925)):
            Circle(SKETCH9_R_2, mode=Mode.SUBTRACT)
    # profile 2 of 4: a face of its own
    with BuildSketch(Plane.XY.offset(6)):
        with Locations((-10.262401035, 5.925)):
            Circle(SKETCH9_R_2)
        with Locations((-10.262401035, 5.925)):
            Circle(SKETCH9_R_4, mode=Mode.SUBTRACT)
    # profile 3 of 4: a face of its own
    with BuildSketch(Plane.XY.offset(6)):
        with Locations((10.262401035, 5.925)):
            Circle(SKETCH9_R_2)
        with Locations((10.262401035, 5.925)):
            Circle(SKETCH9_R_4, mode=Mode.SUBTRACT)
    # profile 4 of 4: a face of its own
    with BuildSketch(Plane.XY.offset(6)):
        with Locations((0, -11.85)):
            Circle(SKETCH9_R_2)
        with Locations((0, -11.85)):
            Circle(SKETCH9_R_4, mode=Mode.SUBTRACT)
    extrude(amount=BOSS_EXTRUDE3_DEPTH)

    # Shell1
    shell1_openings = [body_2.faces().sort_by_distance(p)[0] for p in [
        (-25.993395744, 0, 6),
    ]]
    offset(amount=SHELL1_T, openings=shell1_openings)

    # Boss-Extrude4 outline → Boss-Extrude4 (add)
    # profile 1 of 3: a face of its own
    with BuildSketch(Plane.XY.offset(6).offset(BOSS_EXTRUDE4_START)):
        with BuildLine():
            ThreePointArc((-24.99409118, 9.53194136), (-23.166179551, 13.375), (-20.751948955, 16.879547226))
            ThreePointArc((-20.751948955, 16.879547226), (-29.495127019, 17.029019524), (-24.99409118, 9.53194136))
        make_face()
        with Locations((-25.165, 14.529019524)):
            Circle(BOSS_EXTRUDE4_OUTLINE_R, mode=Mode.SUBTRACT)
    # profile 2 of 3: a face of its own
    with BuildSketch(Plane.XY.offset(6).offset(BOSS_EXTRUDE4_START)):
        with BuildLine():
            ThreePointArc((24.99409118, 9.53194136), (29.495127019, 17.029019524), (20.751948955, 16.879547226))
            ThreePointArc((20.751948955, 16.879547226), (23.166179551, 13.375), (24.99409118, 9.53194136))
        make_face()
        with Locations((25.165, 14.529019524)):
            Circle(BOSS_EXTRUDE4_OUTLINE_R, mode=Mode.SUBTRACT)
    # profile 3 of 3: a face of its own
    with BuildSketch(Plane.XY.offset(6).offset(BOSS_EXTRUDE4_START)):
        with BuildLine():
            ThreePointArc((4.242142224, -26.411488586), (0, -26.75), (-4.242142224, -26.411488586))
            ThreePointArc((-4.242142224, -26.411488586), (0, -34.058039048), (4.242142224, -26.411488586))
        make_face()
        with Locations((0, -29.058039048)):
            Circle(BOSS_EXTRUDE4_OUTLINE_R, mode=Mode.SUBTRACT)
    extrude(amount=BOSS_EXTRUDE4_DEPTH)

    # Fillet2
    fillet2_edges = [body_2.edges().sort_by_distance(p)[0] for p in [
        (-24.99409118, 9.53194136, 13),
        (-20.751948955, 16.879547226, 13),
        (20.751948955, 16.879547226, 13),
        (24.99409118, 9.53194136, 13),
        (4.242142224, -26.411488586, 13),
        (-4.242142224, -26.411488586, 13),
    ]]
    fillet(fillet2_edges, radius=FILLET2_R)

    # Sketch10 → Cut-Extrude4 (cut)
    with BuildSketch(Plane.XY.offset(15)):
        with Locations((-10.262401035, 5.925)):
            Circle(SKETCH10_R)
        with Locations((10.262401035, 5.925)):
            Circle(SKETCH10_R)
        with Locations((0, -11.85)):
            Circle(SKETCH10_R)
    extrude(amount=-CUT_EXTRUDE4_DEPTH, mode=Mode.SUBTRACT)


solid = Compound([part.part, body_2.part])
